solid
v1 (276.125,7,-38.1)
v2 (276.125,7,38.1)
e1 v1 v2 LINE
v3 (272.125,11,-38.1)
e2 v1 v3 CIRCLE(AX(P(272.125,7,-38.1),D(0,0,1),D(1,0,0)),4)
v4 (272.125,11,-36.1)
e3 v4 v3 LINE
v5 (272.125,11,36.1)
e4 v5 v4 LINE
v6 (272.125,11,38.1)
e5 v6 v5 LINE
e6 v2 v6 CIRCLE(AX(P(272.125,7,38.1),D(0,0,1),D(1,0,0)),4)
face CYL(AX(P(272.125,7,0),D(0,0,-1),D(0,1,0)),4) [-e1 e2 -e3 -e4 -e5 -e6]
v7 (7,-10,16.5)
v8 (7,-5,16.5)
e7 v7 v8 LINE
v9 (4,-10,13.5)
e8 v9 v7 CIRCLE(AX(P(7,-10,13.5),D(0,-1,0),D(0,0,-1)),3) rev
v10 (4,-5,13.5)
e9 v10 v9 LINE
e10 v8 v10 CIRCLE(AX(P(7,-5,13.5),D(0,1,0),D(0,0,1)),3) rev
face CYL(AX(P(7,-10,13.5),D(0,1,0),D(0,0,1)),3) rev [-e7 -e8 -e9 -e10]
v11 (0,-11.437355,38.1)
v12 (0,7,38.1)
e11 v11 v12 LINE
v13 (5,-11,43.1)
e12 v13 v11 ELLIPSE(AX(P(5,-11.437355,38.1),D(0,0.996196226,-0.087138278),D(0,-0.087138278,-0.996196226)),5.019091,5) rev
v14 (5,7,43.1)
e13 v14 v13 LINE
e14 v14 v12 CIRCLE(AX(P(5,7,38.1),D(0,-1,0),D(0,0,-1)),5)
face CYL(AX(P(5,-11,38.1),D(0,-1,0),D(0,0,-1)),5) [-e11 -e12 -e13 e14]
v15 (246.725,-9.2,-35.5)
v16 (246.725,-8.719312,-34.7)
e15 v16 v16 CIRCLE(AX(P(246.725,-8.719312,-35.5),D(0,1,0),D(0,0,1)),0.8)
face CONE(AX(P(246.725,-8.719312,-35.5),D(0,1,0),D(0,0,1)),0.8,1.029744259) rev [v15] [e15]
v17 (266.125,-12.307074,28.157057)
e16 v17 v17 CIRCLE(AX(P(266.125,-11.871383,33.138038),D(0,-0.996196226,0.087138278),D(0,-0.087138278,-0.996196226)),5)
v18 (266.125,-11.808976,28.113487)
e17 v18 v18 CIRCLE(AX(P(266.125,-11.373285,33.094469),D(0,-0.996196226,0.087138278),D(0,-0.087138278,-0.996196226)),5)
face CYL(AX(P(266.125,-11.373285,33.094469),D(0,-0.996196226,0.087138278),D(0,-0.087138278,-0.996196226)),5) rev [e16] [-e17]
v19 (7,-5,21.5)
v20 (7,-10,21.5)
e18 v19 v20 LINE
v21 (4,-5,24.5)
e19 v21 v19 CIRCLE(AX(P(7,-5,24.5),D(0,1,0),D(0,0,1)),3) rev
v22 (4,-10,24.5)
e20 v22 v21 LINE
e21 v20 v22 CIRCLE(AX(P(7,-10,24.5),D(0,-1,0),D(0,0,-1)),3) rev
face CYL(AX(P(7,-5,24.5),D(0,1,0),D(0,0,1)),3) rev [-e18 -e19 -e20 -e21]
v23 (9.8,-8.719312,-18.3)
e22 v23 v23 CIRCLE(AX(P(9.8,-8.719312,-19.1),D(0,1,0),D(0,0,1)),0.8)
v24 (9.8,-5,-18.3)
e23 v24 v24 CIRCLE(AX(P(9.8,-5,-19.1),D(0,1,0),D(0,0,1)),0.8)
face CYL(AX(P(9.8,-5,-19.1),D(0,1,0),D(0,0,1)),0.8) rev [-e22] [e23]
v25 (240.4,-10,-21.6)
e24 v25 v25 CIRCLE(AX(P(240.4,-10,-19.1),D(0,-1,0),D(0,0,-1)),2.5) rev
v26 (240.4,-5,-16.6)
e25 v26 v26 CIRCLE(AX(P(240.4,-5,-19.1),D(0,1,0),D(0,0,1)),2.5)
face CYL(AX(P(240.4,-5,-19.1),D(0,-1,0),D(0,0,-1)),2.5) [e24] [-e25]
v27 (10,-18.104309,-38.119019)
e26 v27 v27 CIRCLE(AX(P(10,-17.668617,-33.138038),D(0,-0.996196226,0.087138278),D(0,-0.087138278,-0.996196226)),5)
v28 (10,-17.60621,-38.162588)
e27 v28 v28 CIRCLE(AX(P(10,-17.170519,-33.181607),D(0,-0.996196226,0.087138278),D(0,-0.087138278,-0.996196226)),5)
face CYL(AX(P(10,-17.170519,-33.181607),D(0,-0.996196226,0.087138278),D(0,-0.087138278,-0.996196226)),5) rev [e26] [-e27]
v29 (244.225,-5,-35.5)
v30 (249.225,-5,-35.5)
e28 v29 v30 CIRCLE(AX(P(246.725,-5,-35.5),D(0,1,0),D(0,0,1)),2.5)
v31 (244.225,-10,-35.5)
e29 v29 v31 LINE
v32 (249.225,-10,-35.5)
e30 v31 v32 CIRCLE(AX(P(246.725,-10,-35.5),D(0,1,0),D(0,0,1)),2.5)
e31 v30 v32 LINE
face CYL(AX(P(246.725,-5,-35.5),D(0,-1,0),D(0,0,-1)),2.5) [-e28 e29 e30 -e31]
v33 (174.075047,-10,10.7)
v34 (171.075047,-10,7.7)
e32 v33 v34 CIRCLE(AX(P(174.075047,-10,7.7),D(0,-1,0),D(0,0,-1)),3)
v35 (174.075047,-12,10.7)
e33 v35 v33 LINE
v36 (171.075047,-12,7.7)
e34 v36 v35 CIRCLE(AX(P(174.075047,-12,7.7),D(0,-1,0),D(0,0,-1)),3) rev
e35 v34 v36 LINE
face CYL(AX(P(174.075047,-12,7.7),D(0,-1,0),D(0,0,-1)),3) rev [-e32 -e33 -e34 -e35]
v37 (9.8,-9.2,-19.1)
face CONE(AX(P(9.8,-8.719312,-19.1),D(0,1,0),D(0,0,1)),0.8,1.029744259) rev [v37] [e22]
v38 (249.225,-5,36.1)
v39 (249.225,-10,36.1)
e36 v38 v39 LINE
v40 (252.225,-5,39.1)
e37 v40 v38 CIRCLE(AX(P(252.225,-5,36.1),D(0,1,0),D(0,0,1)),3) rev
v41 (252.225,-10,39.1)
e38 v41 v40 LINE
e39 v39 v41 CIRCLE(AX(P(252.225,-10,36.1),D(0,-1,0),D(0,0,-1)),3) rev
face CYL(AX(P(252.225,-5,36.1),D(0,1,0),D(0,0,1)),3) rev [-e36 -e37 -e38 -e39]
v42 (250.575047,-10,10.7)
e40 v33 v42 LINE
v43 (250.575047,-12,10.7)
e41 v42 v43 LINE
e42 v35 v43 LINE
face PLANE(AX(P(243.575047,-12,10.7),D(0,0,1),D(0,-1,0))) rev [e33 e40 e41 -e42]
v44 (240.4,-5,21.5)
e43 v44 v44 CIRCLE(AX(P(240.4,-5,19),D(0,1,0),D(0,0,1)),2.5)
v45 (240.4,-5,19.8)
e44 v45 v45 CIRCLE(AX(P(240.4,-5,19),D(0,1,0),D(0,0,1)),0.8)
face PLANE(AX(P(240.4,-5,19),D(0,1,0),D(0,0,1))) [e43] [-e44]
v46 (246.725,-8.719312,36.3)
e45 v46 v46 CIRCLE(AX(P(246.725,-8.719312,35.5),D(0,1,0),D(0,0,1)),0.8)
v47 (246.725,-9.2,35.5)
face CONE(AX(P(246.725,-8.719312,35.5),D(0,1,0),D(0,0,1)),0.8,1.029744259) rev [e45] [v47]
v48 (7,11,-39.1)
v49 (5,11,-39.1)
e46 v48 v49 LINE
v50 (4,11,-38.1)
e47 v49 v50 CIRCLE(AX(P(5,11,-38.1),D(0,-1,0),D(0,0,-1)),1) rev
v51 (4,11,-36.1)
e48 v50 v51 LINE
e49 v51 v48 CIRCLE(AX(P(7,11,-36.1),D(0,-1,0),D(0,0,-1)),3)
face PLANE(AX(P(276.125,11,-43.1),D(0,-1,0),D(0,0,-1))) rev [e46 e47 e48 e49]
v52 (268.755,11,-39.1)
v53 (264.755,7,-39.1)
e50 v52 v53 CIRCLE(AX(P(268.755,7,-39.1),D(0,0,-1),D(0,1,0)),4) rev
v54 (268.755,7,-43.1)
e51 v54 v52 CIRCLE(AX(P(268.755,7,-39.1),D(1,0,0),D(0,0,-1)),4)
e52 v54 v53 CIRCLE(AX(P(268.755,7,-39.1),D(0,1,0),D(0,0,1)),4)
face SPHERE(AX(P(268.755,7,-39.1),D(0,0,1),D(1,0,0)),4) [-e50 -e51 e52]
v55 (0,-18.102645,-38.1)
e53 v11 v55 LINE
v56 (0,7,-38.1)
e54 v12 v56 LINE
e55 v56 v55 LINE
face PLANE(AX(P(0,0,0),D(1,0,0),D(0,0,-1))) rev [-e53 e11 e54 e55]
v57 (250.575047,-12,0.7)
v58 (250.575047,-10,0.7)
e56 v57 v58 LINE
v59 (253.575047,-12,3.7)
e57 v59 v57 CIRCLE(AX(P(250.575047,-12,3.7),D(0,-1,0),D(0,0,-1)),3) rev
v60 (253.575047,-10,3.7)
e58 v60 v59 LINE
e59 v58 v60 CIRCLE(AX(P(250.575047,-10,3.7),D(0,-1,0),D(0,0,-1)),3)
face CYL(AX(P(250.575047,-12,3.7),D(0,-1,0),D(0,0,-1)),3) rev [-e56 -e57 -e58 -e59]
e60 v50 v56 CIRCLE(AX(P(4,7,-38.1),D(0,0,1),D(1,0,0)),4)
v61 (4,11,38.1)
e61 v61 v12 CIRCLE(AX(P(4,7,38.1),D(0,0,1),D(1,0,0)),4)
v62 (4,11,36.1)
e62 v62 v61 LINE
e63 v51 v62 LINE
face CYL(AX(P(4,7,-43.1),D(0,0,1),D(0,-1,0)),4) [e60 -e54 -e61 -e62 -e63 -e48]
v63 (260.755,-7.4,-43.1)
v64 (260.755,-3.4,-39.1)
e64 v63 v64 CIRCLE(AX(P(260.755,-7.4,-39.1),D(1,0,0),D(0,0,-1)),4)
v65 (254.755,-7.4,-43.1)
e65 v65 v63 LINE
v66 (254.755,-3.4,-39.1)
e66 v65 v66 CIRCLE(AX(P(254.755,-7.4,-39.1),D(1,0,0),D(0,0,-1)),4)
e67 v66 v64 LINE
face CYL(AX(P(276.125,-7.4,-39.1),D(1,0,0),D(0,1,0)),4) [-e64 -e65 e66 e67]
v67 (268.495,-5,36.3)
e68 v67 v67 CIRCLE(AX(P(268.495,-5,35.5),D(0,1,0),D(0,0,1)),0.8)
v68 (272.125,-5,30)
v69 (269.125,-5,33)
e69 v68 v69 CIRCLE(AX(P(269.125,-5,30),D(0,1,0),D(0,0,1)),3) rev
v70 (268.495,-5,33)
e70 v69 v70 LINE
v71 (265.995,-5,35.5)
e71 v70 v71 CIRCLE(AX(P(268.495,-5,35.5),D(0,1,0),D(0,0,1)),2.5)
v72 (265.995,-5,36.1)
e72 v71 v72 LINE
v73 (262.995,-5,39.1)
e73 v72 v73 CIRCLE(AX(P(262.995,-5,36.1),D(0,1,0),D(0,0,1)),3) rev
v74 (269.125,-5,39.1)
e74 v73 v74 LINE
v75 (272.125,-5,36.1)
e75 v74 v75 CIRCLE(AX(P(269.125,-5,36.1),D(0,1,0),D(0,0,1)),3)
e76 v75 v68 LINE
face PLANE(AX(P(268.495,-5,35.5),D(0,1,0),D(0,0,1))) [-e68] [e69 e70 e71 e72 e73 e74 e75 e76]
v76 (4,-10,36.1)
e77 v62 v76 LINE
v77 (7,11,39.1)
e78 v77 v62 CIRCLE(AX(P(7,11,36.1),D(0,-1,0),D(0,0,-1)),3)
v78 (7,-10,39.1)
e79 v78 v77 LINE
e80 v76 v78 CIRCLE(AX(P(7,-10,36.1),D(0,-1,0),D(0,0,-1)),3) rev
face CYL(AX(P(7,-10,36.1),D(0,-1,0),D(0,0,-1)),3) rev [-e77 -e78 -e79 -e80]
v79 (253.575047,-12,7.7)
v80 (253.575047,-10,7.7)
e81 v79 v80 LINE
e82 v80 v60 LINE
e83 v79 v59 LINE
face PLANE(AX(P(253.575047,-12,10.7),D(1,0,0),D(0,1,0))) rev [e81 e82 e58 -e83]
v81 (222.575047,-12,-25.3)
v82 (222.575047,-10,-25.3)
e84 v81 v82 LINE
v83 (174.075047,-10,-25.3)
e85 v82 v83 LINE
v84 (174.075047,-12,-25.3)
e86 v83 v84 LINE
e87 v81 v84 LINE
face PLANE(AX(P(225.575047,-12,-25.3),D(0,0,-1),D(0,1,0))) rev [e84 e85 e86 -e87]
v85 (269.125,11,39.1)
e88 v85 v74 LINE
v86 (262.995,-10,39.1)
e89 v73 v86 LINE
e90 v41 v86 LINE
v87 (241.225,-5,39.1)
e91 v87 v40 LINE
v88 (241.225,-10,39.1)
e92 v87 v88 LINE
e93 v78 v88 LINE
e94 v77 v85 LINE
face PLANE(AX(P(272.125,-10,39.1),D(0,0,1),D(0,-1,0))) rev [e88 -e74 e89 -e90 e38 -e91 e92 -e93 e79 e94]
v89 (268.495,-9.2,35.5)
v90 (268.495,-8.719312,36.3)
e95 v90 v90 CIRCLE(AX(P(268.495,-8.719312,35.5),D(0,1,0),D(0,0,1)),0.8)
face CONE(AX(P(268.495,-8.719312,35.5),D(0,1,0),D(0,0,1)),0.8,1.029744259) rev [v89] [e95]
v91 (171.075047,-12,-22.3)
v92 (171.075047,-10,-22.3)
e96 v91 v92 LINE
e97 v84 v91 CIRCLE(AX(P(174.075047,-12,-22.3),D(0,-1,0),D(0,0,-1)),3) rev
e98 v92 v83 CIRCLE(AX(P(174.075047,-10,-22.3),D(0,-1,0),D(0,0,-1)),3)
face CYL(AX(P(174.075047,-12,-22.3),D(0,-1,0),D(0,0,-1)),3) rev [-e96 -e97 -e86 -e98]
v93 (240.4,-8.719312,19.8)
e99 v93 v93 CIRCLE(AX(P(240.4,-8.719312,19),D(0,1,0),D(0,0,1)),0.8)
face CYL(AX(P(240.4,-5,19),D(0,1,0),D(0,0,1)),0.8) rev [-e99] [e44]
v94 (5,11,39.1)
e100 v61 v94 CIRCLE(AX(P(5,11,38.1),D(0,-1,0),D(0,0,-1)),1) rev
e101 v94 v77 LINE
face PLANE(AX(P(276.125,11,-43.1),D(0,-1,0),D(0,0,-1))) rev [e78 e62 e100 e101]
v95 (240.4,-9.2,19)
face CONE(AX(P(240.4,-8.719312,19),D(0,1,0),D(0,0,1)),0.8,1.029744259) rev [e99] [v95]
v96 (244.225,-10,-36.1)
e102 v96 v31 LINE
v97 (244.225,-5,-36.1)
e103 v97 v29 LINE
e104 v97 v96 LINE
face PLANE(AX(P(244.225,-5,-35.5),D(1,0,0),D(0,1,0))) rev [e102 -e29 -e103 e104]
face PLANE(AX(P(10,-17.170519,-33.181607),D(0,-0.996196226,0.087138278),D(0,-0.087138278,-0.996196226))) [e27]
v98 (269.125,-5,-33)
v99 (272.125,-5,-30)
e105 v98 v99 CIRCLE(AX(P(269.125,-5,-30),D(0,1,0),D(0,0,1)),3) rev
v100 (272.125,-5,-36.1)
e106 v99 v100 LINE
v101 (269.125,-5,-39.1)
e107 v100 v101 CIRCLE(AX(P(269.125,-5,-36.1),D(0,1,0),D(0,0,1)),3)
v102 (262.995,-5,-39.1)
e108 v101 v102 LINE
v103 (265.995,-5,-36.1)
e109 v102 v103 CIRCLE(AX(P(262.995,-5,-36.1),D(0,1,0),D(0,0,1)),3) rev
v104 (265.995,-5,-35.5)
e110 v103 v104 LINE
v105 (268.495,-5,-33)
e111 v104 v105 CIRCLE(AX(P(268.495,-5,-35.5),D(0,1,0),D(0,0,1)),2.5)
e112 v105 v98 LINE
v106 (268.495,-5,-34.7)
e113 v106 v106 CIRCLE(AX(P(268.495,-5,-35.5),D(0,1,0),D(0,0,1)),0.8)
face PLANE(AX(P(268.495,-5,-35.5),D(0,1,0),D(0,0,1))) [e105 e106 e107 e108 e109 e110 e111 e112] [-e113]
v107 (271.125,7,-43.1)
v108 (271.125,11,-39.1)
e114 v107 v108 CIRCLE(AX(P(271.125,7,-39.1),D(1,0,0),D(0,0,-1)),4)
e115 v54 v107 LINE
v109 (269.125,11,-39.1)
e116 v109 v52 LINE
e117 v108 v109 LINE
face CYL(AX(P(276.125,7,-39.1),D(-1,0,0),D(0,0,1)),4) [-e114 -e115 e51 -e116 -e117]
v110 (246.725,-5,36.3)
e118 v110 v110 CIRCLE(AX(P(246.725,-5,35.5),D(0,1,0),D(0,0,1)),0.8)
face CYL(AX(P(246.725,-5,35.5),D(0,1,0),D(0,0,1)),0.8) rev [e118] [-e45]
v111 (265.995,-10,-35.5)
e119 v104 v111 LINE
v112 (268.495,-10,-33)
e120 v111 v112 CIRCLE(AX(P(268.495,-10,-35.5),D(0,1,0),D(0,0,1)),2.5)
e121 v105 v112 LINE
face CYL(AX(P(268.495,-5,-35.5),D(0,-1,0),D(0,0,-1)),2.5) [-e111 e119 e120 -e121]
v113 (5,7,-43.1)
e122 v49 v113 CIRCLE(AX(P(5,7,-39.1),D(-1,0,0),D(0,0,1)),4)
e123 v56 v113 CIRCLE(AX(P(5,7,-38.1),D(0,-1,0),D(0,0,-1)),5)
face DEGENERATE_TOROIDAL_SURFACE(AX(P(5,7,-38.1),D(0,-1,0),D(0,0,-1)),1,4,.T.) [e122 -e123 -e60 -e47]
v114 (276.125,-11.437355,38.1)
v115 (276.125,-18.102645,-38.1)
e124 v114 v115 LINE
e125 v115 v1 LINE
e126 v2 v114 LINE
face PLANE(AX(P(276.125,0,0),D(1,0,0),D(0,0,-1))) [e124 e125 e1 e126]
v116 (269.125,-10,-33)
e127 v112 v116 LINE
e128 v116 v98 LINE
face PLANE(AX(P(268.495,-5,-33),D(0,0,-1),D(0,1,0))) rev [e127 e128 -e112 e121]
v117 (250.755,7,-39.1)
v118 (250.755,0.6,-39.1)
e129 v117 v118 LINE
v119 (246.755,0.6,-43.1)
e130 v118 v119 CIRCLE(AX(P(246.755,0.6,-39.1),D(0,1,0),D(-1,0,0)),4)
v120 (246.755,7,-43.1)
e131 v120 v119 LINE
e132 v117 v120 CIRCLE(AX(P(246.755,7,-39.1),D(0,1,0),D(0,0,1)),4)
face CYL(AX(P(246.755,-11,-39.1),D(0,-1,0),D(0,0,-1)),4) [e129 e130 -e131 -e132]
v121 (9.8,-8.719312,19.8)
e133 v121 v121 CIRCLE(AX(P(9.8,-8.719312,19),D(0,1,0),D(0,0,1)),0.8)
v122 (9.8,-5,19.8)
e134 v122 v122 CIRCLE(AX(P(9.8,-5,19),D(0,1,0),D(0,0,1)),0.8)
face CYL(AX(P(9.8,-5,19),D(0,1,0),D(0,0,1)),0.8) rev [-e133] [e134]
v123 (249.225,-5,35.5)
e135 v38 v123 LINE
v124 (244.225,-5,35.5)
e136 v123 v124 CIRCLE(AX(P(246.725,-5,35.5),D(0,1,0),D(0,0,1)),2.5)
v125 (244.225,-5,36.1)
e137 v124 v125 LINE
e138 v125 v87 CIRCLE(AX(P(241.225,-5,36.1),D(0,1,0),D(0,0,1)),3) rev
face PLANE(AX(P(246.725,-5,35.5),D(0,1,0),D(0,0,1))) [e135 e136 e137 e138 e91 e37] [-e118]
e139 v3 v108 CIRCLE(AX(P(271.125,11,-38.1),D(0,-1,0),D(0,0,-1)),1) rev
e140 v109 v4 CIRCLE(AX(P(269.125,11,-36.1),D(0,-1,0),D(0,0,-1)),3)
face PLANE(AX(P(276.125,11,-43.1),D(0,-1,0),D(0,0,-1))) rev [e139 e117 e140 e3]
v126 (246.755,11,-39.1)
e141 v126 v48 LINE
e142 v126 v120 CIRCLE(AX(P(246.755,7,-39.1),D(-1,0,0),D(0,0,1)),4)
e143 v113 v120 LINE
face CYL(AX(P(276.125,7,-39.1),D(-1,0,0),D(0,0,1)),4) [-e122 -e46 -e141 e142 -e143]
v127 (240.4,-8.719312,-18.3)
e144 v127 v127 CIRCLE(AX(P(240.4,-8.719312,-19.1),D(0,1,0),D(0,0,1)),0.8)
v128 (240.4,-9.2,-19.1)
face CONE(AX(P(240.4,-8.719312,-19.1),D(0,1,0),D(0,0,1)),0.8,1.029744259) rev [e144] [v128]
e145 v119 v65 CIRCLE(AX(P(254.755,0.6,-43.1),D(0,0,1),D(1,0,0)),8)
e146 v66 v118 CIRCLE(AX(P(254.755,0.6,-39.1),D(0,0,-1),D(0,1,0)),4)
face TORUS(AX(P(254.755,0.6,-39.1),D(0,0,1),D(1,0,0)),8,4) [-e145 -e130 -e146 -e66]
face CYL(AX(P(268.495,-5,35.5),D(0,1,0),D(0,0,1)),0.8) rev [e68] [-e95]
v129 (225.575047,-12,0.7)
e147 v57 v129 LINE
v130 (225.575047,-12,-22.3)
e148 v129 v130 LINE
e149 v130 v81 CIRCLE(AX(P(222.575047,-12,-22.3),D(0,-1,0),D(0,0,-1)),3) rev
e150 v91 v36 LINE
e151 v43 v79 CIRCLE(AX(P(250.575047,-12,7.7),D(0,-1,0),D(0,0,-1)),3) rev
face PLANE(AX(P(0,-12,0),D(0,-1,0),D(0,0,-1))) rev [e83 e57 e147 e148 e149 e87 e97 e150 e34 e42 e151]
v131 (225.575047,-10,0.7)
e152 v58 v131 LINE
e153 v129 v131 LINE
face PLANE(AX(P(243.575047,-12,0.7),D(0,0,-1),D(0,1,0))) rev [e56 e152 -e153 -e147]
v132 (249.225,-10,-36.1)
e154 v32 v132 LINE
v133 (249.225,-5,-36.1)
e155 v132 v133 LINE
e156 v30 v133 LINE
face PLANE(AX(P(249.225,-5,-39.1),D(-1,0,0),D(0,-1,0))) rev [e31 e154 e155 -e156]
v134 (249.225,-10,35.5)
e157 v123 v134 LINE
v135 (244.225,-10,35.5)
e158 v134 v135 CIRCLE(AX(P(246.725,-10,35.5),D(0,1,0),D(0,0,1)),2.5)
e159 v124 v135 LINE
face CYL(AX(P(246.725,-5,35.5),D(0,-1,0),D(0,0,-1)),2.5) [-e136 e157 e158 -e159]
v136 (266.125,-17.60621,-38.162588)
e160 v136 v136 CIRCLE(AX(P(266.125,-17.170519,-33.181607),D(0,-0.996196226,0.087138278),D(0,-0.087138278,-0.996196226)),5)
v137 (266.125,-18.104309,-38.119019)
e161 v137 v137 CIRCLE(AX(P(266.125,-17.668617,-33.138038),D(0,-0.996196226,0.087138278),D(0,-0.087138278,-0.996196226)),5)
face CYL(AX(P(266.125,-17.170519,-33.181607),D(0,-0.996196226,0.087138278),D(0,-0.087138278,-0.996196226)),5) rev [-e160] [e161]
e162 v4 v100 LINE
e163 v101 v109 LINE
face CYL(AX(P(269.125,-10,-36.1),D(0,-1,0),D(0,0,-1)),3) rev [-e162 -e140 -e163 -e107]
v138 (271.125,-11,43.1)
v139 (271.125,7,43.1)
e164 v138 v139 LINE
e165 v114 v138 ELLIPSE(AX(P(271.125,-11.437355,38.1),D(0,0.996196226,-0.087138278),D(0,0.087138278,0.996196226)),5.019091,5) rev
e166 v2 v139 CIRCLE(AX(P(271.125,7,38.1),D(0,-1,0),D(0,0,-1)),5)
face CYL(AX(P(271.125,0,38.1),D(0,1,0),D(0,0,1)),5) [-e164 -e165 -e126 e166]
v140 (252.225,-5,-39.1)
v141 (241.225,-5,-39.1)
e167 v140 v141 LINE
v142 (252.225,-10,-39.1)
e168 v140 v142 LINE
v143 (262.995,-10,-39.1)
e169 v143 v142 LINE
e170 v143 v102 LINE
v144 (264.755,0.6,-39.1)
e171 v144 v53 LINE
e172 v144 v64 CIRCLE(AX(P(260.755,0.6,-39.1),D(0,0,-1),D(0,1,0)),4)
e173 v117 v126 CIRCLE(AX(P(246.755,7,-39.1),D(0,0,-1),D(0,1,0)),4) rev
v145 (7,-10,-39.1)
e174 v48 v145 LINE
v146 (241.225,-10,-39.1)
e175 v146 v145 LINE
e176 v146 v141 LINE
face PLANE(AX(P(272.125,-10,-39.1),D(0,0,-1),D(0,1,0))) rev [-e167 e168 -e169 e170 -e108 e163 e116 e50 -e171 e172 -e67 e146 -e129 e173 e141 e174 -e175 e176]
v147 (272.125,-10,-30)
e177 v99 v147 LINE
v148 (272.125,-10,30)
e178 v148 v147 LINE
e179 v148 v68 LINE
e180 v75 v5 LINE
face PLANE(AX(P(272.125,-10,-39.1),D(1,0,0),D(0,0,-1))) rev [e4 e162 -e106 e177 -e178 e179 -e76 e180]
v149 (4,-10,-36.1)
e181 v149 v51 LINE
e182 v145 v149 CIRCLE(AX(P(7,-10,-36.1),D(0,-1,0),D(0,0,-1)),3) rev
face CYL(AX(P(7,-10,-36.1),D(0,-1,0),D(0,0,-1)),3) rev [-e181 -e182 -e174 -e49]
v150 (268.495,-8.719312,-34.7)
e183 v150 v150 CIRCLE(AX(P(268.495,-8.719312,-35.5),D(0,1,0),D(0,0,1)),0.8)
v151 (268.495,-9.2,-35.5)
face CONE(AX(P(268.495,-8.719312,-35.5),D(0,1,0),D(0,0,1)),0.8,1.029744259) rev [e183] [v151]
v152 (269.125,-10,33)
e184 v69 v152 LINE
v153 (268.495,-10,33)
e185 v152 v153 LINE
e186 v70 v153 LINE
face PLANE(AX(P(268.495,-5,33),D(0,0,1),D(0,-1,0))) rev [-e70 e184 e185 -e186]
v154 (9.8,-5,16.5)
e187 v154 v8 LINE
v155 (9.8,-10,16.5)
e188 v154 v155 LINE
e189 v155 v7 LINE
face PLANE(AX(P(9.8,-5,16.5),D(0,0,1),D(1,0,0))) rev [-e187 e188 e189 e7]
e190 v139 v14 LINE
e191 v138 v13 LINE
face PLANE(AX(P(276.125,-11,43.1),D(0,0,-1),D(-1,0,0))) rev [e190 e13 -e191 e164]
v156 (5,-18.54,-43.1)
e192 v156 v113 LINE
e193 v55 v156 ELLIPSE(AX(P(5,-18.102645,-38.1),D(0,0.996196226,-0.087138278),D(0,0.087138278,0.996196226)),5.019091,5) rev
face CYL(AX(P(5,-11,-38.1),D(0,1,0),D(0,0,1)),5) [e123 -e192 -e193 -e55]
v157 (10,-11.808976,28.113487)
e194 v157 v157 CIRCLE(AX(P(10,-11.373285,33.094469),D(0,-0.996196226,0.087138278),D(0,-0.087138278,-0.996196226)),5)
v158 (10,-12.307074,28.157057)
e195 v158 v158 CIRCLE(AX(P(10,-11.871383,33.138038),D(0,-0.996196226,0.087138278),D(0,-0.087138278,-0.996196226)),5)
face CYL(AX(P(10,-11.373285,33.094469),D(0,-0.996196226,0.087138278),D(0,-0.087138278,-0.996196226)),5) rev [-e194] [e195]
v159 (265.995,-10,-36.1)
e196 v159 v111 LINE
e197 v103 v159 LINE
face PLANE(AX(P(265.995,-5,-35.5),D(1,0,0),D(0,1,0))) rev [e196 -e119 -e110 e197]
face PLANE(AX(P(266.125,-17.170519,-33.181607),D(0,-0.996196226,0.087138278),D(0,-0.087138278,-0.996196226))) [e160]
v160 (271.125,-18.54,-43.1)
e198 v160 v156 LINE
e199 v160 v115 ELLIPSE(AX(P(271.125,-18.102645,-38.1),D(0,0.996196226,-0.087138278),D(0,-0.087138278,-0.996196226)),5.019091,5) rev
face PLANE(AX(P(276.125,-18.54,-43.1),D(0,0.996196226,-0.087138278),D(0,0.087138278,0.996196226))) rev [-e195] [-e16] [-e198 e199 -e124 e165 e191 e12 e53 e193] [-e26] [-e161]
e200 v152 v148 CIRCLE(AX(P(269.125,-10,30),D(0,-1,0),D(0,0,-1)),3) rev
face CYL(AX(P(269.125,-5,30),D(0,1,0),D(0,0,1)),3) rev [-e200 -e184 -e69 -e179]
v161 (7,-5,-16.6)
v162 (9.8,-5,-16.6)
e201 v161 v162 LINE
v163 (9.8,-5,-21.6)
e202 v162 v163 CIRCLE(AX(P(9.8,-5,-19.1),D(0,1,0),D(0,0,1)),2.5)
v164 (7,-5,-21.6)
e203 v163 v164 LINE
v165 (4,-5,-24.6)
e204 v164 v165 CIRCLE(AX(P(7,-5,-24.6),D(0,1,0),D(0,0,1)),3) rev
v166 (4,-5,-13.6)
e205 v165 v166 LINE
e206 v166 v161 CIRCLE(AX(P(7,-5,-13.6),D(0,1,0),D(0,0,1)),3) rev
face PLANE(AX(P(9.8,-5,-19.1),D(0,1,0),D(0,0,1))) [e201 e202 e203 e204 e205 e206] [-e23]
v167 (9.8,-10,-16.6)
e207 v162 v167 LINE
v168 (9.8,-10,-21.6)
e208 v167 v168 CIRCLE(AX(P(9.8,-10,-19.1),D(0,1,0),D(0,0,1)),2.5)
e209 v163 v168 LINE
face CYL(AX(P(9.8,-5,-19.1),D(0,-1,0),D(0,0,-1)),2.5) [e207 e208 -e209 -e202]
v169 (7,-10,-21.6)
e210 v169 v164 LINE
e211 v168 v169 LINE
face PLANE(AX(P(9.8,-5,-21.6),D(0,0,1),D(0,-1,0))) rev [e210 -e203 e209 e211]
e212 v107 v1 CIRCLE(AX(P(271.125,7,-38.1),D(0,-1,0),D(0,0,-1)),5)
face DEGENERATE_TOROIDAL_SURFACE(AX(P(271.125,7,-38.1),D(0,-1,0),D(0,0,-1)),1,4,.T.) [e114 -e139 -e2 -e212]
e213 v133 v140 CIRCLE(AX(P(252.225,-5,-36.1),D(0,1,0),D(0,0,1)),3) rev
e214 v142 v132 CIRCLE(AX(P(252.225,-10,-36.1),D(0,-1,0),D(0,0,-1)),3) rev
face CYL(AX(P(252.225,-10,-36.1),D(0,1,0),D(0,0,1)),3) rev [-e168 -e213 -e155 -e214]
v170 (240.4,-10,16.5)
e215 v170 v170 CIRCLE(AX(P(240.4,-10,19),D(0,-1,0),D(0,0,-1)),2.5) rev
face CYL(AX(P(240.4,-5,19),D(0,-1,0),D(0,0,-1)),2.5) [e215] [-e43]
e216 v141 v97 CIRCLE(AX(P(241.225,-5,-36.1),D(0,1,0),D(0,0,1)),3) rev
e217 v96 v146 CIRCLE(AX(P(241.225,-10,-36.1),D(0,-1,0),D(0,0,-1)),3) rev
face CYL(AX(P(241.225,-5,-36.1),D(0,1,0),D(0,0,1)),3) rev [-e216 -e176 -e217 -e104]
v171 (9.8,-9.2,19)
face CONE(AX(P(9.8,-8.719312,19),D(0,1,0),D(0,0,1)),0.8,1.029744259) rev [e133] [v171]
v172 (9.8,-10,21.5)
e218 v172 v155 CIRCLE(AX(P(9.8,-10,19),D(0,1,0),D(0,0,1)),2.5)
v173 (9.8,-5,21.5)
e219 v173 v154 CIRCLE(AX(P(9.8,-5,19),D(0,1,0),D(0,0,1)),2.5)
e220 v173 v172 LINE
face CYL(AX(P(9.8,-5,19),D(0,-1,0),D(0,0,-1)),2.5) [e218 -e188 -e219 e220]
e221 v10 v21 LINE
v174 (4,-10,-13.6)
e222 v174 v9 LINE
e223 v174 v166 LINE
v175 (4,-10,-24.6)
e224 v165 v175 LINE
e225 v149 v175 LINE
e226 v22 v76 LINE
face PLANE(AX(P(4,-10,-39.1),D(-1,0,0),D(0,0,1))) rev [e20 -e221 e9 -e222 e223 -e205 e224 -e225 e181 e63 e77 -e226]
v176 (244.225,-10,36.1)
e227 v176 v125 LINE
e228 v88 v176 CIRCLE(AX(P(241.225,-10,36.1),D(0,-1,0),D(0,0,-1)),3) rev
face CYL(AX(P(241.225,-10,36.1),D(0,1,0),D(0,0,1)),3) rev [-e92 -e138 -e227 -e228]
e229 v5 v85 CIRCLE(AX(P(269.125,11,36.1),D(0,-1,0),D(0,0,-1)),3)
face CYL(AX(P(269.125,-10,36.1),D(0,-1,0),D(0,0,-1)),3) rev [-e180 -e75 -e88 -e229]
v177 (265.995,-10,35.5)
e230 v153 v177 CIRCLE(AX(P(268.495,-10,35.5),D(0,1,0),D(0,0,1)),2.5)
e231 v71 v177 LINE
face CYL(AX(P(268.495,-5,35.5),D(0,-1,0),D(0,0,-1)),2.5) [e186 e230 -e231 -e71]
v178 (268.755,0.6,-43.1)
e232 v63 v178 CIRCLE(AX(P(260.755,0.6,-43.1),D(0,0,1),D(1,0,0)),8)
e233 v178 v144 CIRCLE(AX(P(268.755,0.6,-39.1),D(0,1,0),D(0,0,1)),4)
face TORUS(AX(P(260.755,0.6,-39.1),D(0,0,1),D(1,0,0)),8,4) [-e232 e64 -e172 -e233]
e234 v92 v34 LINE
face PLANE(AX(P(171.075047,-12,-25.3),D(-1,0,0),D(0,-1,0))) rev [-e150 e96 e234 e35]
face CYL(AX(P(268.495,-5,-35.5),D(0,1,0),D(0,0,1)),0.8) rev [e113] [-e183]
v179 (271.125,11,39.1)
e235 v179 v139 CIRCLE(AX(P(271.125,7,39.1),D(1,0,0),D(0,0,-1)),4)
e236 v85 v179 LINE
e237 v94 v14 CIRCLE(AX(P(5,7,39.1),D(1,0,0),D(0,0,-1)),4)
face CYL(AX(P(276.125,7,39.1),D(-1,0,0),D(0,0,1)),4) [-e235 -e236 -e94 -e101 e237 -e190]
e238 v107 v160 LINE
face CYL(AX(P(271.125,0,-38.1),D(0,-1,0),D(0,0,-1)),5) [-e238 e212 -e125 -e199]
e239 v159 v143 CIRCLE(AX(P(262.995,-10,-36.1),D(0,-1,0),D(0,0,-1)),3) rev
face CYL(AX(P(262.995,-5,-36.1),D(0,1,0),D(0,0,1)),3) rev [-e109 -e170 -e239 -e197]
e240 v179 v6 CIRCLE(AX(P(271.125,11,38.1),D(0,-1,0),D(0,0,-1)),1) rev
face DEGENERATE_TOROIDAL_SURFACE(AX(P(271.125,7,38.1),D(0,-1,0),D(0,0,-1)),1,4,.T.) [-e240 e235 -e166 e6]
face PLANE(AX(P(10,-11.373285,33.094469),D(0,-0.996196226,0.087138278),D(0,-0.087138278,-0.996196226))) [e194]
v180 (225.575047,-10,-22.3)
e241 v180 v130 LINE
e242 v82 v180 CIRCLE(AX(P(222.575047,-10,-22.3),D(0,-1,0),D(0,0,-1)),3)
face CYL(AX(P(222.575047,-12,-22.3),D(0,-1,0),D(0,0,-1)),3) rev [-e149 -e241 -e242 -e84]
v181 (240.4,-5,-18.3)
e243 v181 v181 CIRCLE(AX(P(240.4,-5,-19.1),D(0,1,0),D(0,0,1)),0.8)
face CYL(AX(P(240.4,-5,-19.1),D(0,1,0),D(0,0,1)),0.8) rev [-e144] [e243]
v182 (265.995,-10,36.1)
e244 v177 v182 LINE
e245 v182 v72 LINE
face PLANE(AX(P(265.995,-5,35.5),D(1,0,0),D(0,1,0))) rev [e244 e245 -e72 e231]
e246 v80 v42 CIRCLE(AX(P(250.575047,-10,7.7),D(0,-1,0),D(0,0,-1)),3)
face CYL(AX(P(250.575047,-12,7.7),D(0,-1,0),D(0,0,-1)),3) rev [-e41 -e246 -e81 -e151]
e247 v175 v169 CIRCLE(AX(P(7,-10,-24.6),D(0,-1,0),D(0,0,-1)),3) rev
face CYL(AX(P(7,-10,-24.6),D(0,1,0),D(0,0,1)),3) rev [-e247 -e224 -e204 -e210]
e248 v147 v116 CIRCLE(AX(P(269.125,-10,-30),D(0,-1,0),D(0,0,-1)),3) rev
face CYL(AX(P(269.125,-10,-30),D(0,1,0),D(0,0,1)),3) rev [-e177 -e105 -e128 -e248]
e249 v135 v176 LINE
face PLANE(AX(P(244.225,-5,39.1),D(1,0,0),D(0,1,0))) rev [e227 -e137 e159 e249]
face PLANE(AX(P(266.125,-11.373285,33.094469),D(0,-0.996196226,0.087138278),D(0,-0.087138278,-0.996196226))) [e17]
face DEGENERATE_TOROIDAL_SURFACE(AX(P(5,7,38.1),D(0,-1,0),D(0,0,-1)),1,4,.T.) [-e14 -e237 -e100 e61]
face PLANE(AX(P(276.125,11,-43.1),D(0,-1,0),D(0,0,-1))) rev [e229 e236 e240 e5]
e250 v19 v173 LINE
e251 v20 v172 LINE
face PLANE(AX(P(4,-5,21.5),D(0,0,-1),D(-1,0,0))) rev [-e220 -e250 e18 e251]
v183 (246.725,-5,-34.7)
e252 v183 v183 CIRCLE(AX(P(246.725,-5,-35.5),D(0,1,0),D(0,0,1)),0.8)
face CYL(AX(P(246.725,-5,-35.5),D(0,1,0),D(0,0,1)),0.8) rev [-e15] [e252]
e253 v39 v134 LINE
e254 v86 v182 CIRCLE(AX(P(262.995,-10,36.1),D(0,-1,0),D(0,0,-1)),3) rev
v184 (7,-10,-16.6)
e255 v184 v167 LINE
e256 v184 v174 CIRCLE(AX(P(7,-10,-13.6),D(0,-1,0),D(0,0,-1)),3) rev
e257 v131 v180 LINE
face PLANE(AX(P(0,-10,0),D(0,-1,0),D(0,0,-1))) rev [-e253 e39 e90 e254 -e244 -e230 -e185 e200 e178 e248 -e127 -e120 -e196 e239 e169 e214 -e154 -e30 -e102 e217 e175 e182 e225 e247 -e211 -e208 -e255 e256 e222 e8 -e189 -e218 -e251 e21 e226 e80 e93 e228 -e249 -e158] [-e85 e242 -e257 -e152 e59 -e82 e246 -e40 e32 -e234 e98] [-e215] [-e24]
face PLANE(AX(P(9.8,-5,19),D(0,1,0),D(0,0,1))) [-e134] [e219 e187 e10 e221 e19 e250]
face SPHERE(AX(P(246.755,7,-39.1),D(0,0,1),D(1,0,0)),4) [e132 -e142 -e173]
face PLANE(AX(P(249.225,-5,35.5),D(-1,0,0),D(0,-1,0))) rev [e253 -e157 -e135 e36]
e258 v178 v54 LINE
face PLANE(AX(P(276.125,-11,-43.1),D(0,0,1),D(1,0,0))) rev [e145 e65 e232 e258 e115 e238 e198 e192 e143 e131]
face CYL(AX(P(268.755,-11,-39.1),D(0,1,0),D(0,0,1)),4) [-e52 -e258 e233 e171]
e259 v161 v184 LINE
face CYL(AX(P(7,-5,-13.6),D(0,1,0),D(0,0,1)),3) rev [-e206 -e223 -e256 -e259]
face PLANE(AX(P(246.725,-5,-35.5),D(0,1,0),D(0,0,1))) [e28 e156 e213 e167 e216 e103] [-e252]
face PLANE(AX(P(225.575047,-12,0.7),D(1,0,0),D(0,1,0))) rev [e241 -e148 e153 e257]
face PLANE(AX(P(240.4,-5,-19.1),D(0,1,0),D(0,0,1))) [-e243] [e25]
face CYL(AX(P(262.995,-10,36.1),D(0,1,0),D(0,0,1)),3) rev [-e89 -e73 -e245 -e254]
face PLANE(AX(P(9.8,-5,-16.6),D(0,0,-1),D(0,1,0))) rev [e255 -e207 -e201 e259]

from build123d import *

# Parameters (mm, degrees)
BOSS_EXTRUDE1_DEPTH       = 276.125
SKETCH3_W                 = 268.125
SKETCH3_H                 = 78.2
CUT_EXTRUDE1_DEPTH        = 21
SKETCH4_W                 = 14
SKETCH4_H                 = 14.4
CUT_EXTRUDE2_DEPTH        = 4
FILLET1_R                 = 5
FILLET4_R                 = 3
FILLET5_R                 = 4
FILLET6_R                 = 4
SKETCH5_R                 = 2.5
BOSS_EXTRUDE2_DEPTH       = 5
FILLET7_R                 = 3
M2X0_4_TAPPED_HOLE4_D     = 1.6
M2X0_4_TAPPED_HOLE4_DEPTH = 3.719311505
M2X0_4_TAPPED_HOLE4_TIP   = 0.480688495
CUT_EXTRUDE3_DEPTH        = 2
FILLET8_R                 = 3
SKETCH10_R                = 5
CUT_EXTRUDE4_DEPTH        = 0.5


with BuildPart() as part:
    # Sketch1 → Boss-Extrude1 (new body)
    with BuildSketch(Plane(origin=(0, 0, 0), x_dir=(0, 0, -1), z_dir=(1, 0, 0))):
        Polygon((43.1, -11), (43.1, -18.54), (-43.1, -11), (-43.1, 11), (43.1, 11), align=None)
    extrude(amount=BOSS_EXTRUDE1_DEPTH)

    # Sketch3 → Cut-Extrude1 (cut)
    with BuildSketch(Plane(origin=(0, 11, 0), x_dir=(1, 0, 0), z_dir=(0, 1, 0))):
        with Locations((138.0625, 0)):
            Rectangle(SKETCH3_W, SKETCH3_H)
    extrude(amount=-CUT_EXTRUDE1_DEPTH, mode=Mode.SUBTRACT)

    # Sketch4 → Cut-Extrude2 (cut)
    with BuildSketch(Plane.XY.offset(-39.1)):
        with Locations((257.755, 3.8)):
            Rectangle(SKETCH4_W, SKETCH4_H)
    extrude(amount=-CUT_EXTRUDE2_DEPTH, mode=Mode.SUBTRACT)

    # Fillet1
    fillet1_edges = [part.edges().sort_by_distance(p)[0] for p in [
        (276.125, -3.77, -43.1),
        (276.125, 0, 43.1),
        (0, -3.77, -43.1),
        (0, 0, 43.1),
    ]]
    fillet(fillet1_edges, radius=FILLET1_R)

    # Fillet4
    fillet4_edges = [part.edges().sort_by_distance(p)[0] for p in [
        (272.125, 0.5, -39.1),
        (272.125, 0.5, 39.1),
        (4, 0.5, 39.1),
        (4, 0.5, -39.1),
    ]]
    fillet(fillet4_edges, radius=FILLET4_R)

    # Fillet5
    fillet5_edges = [part.edges().sort_by_distance(p)[0] for p in [
        (264.755, 11, -41.1),
        (264.755, -3.4, -41.1),
        (250.755, -3.4, -41.1),
        (250.755, 11, -41.1),
    ]]
    fillet(fillet5_edges, radius=FILLET5_R)

    # Fillet6
    fillet6_edges = [part.edges().sort_by_distance(p)[0] for p in [
        (274.660533906, 11, 41.635533906),
        (276.125, 11, 0),
        (274.660533906, 11, -41.635533906),
        (269.94, 11, -43.1),
        (265.926572875, 9.828427125, -43.1),
        (264.755, 3.8, -43.1),
        (263.583427125, -2.228427125, -43.1),
        (257.755, -3.4, -43.1),
        (251.926572875, -2.228427125, -43.1),
        (250.755, 3.8, -43.1),
        (249.583427125, 9.828427125, -43.1),
        (125.8775, 11, -43.1),
        (1.464466094, 11, -41.635533906),
        (0, 11, 0),
        (1.464466094, 11, 41.635533906),
        (138.0625, 11, 43.1),
    ]]
    fillet(fillet6_edges, radius=FILLET6_R - 0.0001)  # a hair under: the kernel refuses the full size

    # Sketch5 → Boss-Extrude2 (add)
    with BuildSketch(Plane(origin=(0, -10, 0), x_dir=(1, 0, 0), z_dir=(0, 1, 0))):
        with Locations(Location((240.4, 19.1, 0), (0, 0, 90))):
            Circle(SKETCH5_R)
        with Locations(Location((240.4, -19, 0), (0, 0, 90))):
            Circle(SKETCH5_R)
        with BuildLine():
            Line((9.8, 21.6), (4, 21.6))
            Line((4, 21.6), (4, 16.6))
            Line((4, 16.6), (9.8, 16.6))
            ThreePointArc((9.8, 16.6), (12.3, 19.1), (9.8, 21.6))
        make_face()
        with BuildLine():
            Line((9.8, -16.5), (4, -16.5))
            Line((4, -16.5), (4, -21.5))
            Line((4, -21.5), (9.8, -21.5))
            ThreePointArc((9.8, -21.5), (12.3, -19), (9.8, -16.5))
        make_face()
        with BuildLine():
            Line((244.225, 35.5), (244.225, 39.1))
            Line((244.225, 39.1), (249.225, 39.1))
            Line((249.225, 39.1), (249.225, 35.5))
            ThreePointArc((249.225, 35.5), (246.725, 33), (244.225, 35.5))
        make_face()
        with BuildLine():
            Line((265.995, 35.5), (265.995, 39.1))
            Line((265.995, 39.1), (269.125, 39.1))
            ThreePointArc((269.125, 39.1), (271.246320344, 38.221320344), (272.125, 36.1))
            Line((272.125, 36.1), (272.125, 33))
            Line((272.125, 33), (268.495, 33))
            ThreePointArc((268.495, 33), (266.727233047, 33.732233047), (265.995, 35.5))
        make_face()
        with BuildLine():
            Line((249.225, -35.5), (249.225, -39.1))
            Line((249.225, -39.1), (244.225, -39.1))
            Line((244.225, -39.1), (244.225, -35.5))
            ThreePointArc((244.225, -35.5), (246.725, -33), (249.225, -35.5))
        make_face()
        with BuildLine():
            Line((268.495, -33), (272.125, -33))
            Line((272.125, -33), (272.125, -36.1))
            ThreePointArc((272.125, -36.1), (271.246320344, -38.221320344), (269.125, -39.1))
            Line((269.125, -39.1), (265.995, -39.1))
            Line((265.995, -39.1), (265.995, -35.5))
            ThreePointArc((265.995, -35.5), (266.727233047, -33.732233047), (268.495, -33))
        make_face()
    extrude(amount=BOSS_EXTRUDE2_DEPTH)

    # Fillet7
    fillet7_edges = [part.edges().sort_by_distance(p)[0] for p in [
        (4, -7.5, 16.5),
        (4, -7.5, 21.5),
        (244.225, -7.5, 39.1),
        (249.225, -7.5, 39.1),
        (265.995, -7.5, 39.1),
        (272.125, -7.5, 33),
        (249.225, -7.5, -39.1),
        (244.225, -7.5, -39.1),
        (4, -7.5, -21.6),
        (4, -7.5, -16.6),
        (272.125, -7.5, -33),
        (265.995, -7.5, -39.1),
    ]]
    fillet(fillet7_edges, radius=FILLET7_R)

    # M2x0.4 Tapped Hole4
    with Locations(Plane(origin=(0, -5, 0), x_dir=(1, 0, 0), z_dir=(0, 1, 0))):
        with Locations((9.8, 19.1), (9.8, -19), (240.4, 19.1), (240.4, -19), (246.725, 35.5), (268.495, 35.5), (268.495, -35.5), (246.725, -35.5)):
            Hole(M2X0_4_TAPPED_HOLE4_D / 2, depth=M2X0_4_TAPPED_HOLE4_DEPTH)
            with Locations((0, 0, -(M2X0_4_TAPPED_HOLE4_DEPTH + M2X0_4_TAPPED_HOLE4_TIP / 2))):  # 118° drill point
                Cone(0, M2X0_4_TAPPED_HOLE4_D / 2, M2X0_4_TAPPED_HOLE4_TIP, mode=Mode.SUBTRACT)

    # Sketch9 → Cut-Extrude3 (cut)
    with BuildSketch(Plane(origin=(0, -10, 0), x_dir=(1, 0, 0), z_dir=(0, 1, 0))):
        Polygon((243.575047285, -10.7), (253.575047285, -10.7), (253.575047285, -0.7), (243.575047285, -0.7), (225.575047285, -0.7), (225.575047285, 25.3), (171.075047285, 25.3), (171.075047285, -10.7), align=None)
    extrude(amount=-CUT_EXTRUDE3_DEPTH, mode=Mode.SUBTRACT)

    # Fillet8
    fillet8_edges = [part.edges().sort_by_distance(p)[0] for p in [
        (253.575047285, -11, 0.7),
        (253.575047285, -11, 10.7),
        (171.075047285, -11, 10.7),
        (171.075047285, -11, -25.3),
        (225.575047285, -11, -25.3),
    ]]
    fillet(fillet8_edges, radius=FILLET8_R)

    # Sketch10 → Cut-Extrude4 (cut)
    with BuildSketch(Plane(origin=(0, -14.657850216, 1.282136782), x_dir=(1, 0, 0), z_dir=(0, -0.9961962259253339, 0.08713827776655463))):
        with Locations(Location((266.125, -34.551601007, 0), (0, 0, 270))):
            Circle(SKETCH10_R)
        with Locations(Location((266.125, 31.977536282, 0), (0, 0, 270))):
            Circle(SKETCH10_R)
        with Locations(Location((10, 31.977536282, 0), (0, 0, 270))):
            Circle(SKETCH10_R)
        with Locations(Location((10, -34.551601007, 0), (0, 0, 270))):
            Circle(SKETCH10_R)
    extrude(amount=-CUT_EXTRUDE4_DEPTH, mode=Mode.SUBTRACT)


solid = part.part
